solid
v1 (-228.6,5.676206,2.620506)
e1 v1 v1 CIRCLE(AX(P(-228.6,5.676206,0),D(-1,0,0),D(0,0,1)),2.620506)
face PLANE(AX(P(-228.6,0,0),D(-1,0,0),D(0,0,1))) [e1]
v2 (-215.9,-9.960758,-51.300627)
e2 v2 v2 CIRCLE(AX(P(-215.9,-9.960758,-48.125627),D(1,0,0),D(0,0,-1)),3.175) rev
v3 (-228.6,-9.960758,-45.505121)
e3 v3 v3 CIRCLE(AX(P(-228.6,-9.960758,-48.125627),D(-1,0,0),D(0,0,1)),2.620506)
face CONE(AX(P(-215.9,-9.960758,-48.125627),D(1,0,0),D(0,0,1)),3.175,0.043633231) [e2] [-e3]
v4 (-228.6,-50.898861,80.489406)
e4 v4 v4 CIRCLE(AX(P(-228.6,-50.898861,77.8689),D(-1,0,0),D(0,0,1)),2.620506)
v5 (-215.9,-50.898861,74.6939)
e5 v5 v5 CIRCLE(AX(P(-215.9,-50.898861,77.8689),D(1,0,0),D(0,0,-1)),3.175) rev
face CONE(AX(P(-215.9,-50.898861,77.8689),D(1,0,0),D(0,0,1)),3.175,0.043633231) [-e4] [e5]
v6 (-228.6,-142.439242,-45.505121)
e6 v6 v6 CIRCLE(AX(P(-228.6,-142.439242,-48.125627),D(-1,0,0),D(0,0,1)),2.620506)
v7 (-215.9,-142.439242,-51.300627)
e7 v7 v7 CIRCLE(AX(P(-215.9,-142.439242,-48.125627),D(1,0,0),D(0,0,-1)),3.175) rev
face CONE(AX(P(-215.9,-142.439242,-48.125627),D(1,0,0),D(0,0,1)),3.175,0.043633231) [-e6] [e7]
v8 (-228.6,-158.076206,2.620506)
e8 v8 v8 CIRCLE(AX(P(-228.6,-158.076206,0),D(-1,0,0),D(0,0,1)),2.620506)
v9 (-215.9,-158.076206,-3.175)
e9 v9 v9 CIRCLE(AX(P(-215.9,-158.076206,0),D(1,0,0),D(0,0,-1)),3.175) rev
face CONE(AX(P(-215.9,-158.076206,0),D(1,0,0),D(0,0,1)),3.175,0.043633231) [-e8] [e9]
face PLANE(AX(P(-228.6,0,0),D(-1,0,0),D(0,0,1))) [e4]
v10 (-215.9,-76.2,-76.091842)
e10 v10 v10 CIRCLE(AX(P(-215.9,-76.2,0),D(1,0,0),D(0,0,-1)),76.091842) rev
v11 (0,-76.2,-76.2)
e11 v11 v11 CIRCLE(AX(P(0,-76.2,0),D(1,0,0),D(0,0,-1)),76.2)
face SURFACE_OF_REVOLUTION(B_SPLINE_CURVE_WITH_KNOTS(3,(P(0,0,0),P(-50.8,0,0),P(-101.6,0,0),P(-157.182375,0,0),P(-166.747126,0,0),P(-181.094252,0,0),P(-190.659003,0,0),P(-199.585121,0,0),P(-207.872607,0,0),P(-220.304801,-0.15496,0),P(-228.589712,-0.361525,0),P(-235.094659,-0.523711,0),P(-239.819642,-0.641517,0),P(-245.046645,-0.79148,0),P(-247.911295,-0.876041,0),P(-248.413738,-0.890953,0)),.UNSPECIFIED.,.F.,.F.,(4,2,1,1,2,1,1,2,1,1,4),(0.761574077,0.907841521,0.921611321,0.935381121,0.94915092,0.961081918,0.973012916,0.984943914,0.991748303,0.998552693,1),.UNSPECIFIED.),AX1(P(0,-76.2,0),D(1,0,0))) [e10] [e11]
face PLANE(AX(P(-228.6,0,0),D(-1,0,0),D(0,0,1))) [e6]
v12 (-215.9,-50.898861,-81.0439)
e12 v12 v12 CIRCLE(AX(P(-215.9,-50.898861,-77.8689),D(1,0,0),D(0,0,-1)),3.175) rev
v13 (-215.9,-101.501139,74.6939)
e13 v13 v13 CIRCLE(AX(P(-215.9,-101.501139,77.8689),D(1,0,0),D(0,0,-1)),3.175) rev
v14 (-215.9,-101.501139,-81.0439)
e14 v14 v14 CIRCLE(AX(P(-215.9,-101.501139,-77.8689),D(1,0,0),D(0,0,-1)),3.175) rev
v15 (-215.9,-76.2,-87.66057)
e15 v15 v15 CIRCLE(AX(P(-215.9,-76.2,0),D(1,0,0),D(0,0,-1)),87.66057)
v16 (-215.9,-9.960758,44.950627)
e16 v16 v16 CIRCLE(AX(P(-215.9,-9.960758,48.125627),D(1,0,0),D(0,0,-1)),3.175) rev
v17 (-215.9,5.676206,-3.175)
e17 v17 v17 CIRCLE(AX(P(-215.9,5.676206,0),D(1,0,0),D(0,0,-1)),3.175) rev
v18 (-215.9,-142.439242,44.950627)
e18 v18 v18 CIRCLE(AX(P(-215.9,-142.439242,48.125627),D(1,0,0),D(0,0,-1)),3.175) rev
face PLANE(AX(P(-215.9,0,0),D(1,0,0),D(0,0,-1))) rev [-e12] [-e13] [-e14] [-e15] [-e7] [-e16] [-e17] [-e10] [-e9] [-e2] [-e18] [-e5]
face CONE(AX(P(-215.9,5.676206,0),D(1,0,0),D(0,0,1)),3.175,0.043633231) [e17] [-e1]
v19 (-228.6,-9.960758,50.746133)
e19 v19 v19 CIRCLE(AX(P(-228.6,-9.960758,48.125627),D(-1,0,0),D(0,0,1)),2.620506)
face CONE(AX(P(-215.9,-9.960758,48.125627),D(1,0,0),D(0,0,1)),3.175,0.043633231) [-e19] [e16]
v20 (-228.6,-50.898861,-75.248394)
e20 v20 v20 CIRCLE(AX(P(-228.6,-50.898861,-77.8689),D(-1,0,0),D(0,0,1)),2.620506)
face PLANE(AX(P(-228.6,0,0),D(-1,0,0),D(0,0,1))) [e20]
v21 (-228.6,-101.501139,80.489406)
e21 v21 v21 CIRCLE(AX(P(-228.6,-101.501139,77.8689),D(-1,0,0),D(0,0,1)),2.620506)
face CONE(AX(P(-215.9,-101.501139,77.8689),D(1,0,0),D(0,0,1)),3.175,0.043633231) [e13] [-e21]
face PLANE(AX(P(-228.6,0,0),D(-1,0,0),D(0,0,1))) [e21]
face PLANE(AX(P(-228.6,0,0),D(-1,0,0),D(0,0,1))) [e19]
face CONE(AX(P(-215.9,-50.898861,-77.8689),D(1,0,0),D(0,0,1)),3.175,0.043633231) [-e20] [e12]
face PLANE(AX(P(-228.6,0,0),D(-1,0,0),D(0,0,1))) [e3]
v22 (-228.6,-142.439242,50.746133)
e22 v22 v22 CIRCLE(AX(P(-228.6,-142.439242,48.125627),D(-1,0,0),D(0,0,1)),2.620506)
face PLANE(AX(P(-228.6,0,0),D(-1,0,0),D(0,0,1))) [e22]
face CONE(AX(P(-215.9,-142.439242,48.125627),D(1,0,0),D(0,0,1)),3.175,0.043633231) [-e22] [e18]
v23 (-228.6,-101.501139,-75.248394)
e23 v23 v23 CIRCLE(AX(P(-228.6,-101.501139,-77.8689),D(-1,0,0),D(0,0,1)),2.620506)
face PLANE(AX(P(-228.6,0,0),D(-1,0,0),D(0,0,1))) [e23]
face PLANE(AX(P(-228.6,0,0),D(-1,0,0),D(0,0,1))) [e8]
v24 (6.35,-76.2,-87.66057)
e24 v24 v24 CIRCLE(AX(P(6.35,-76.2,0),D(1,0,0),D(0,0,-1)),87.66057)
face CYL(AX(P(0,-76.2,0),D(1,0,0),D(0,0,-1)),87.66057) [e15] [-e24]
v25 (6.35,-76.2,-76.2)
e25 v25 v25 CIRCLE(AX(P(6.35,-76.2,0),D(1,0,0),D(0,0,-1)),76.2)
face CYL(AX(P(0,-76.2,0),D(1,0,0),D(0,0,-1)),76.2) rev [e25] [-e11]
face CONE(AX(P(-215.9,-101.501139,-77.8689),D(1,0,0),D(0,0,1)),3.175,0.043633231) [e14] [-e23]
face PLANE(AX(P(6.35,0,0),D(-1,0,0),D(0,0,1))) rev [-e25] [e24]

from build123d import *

# Parameters (mm, degrees)
SKETCH2_R                      = 110.114743718
CUT_EXTRUDE1_DEPTH             = 737.012183471
SKETCH3_R                      = 3.175
BOSS_EXTRUDE1_DEPTH            = 12.7
BOSS_EXTRUDE1_DRAFT            = 2.5
BOSS_EXTRUDE1_PROFILE_2_DEPTH  = 12.7
BOSS_EXTRUDE1_PROFILE_2_DRAFT  = 2.5
BOSS_EXTRUDE1_PROFILE_3_DEPTH  = 12.7
BOSS_EXTRUDE1_PROFILE_3_DRAFT  = 2.5
BOSS_EXTRUDE1_PROFILE_4_DEPTH  = 12.7
BOSS_EXTRUDE1_PROFILE_4_DRAFT  = 2.5
BOSS_EXTRUDE1_PROFILE_5_DEPTH  = 12.7
BOSS_EXTRUDE1_PROFILE_5_DRAFT  = 2.5
BOSS_EXTRUDE1_PROFILE_6_DEPTH  = 12.7
BOSS_EXTRUDE1_PROFILE_6_DRAFT  = 2.5
BOSS_EXTRUDE1_PROFILE_7_DEPTH  = 12.7
BOSS_EXTRUDE1_PROFILE_7_DRAFT  = 2.5
BOSS_EXTRUDE1_PROFILE_8_DEPTH  = 12.7
BOSS_EXTRUDE1_PROFILE_8_DRAFT  = 2.5
BOSS_EXTRUDE1_PROFILE_9_DEPTH  = 12.7
BOSS_EXTRUDE1_PROFILE_9_DRAFT  = 2.5
BOSS_EXTRUDE1_PROFILE_10_DEPTH = 12.7
BOSS_EXTRUDE1_PROFILE_10_DRAFT = 2.5


with BuildPart() as part:
    # Sketch1 → Revolve1 (revolve)
    with BuildSketch(Plane.XY):
        with BuildLine():
            Line((6.35, 11.460570284), (-259.812483715, 11.460570284))
            add(Edge.make_bspline(
                [(-259.812483715, 11.460570284), (-287.31210638, 10.562340852), (-342.298022137, 8.171569009), (-452.140135716, 1.833524736), (-589.280273052, -8.512118808), (-726.176632388, -21.770900754), (-835.465785428, -34.58872614), (-890.027026607, -41.965202762), (-917.245364413, -46.039623622)],
                knots=[0.121539178, 0.121539178, 0.121539178, 0.121539178, 0.200323508, 0.279107838, 0.436676499, 0.594245159, 0.67302949, 0.75181382, 0.75181382, 0.75181382, 0.75181382], degree=3))
            ThreePointArc((-917.245364413, -46.039623622), (-924.987260279, -50.310773033), (-928.0652, -58.599678629))
            Line((-928.0652, -58.599678629), (-921.7152, -58.599678629))
            ThreePointArc((-921.7152, -58.599678629), (-920.17623014, -54.455225831), (-916.305282206, -52.319651125))
            add(Edge.make_bspline(
                [(-259.605182082, 5.113954963), (-267.127682546, 4.868244998), (-283.42603151, 4.285669281), (-317.270262329, 2.880505646), (-361.130016616, 0.711244662), (-431.275457269, -3.371956494), (-501.372917975, -8.266876273), (-571.414486843, -13.891682648), (-623.914744737, -18.477698889), (-676.380314027, -23.439349795), (-728.80566324, -28.799062072), (-772.453634614, -33.627485173), (-807.34181653, -37.739154543), (-833.490683911, -40.958900147), (-859.619375692, -44.328941115), (-885.723877265, -47.869335132), (-904.612492975, -50.577906922), (-914.800968172, -52.094464395), (-916.305282206, -52.319651125)],
                knots=[0.121539178, 0.121539178, 0.121539178, 0.121539178, 0.143122913, 0.168303261, 0.218663957, 0.269024652, 0.369746043, 0.420106738, 0.470467434, 0.520828129, 0.571188825, 0.62154952, 0.646729868, 0.671910216, 0.697090564, 0.722270911, 0.747451259, 0.75181382, 0.75181382, 0.75181382, 0.75181382], degree=3))
            ThreePointArc((-259.605182082, 5.113954963), (-256.399753184, 4.364993874), (-254, 2.11179575))
            ThreePointArc((-254, 2.11179575), (-251.60858665, -0.136927523), (-248.413737762, -0.890953221))
            add(Edge.make_bspline(
                [(0, 0), (-50.8, 0), (-101.6, 0), (-157.182375328, 0), (-166.747125983, 0), (-181.094251966, 0), (-190.659002621, 0), (-199.585120865, 0), (-207.872606698, 0), (-220.304800851, -0.154959839), (-228.589711976, -0.361524821), (-235.094659099, -0.523710542), (-239.819642219, -0.641517002), (-245.046645359, -0.791480258), (-247.911294959, -0.876040976), (-248.413737762, -0.890953221)],
                knots=[0.761574077, 0.761574077, 0.761574077, 0.761574077, 0.907841521, 0.907841521, 0.921611321, 0.935381121, 0.94915092, 0.94915092, 0.961081918, 0.973012916, 0.984943914, 0.984943914, 0.991748303, 0.998552693, 1, 1, 1, 1], degree=3))
            Line((0, 0), (6.35, 0))
            Line((6.35, 0), (6.35, 11.460570284))
        make_face()
    revolve(axis=Axis((0, -76.2, 0), (-1, 0, 0)))

    # Sketch2 → Cut-Extrude1 (cut, through all)
    with BuildSketch(Plane(origin=(-215.9, 0, 0), x_dir=(0, 0, -1), z_dir=(1, 0, 0))):
        with Locations((0, -76.2)):
            Circle(SKETCH2_R)
    extrude(amount=-CUT_EXTRUDE1_DEPTH, mode=Mode.SUBTRACT)


with BuildPart() as boss_extrude1_tool:
    # Sketch3 → Boss-Extrude1 (with draft: the straight prism first)
    with BuildSketch(Plane.ZY.offset(215.9)):
        with Locations((0, 5.676206313)):
            Circle(SKETCH3_R)
    extrude(amount=BOSS_EXTRUDE1_DEPTH)
    # Boss-Extrude1: the draft: its side faces are tilted about the plane it starts from
    boss_extrude1_sides = [boss_extrude1_tool.faces().sort_by_distance(p)[0] for p in [
        (-222.25, 5.676206313, -3.175),
    ]]
    draft(boss_extrude1_sides, Plane.ZY.offset(215.9), BOSS_EXTRUDE1_DRAFT)


with BuildPart() as part_1:
    add(part.part)

    # Boss-Extrude1: add boss_extrude1_tool
    add(boss_extrude1_tool.part)


with BuildPart() as boss_extrude1_profile_2_tool:
    # Sketch3 → Boss-Extrude1 profile 2 (with draft: the straight prism first)
    with BuildSketch(Plane.ZY.offset(215.9)):
        with Locations((48.125626585, -9.960757658)):
            Circle(SKETCH3_R)
    extrude(amount=BOSS_EXTRUDE1_PROFILE_2_DEPTH)
    # Boss-Extrude1 profile 2: the draft: its side faces are tilted about the plane it starts from
    boss_extrude1_profile_2_sides = [boss_extrude1_profile_2_tool.faces().sort_by_distance(p)[0] for p in [
        (-222.25, -9.960757658, 44.950626585),
    ]]
    draft(boss_extrude1_profile_2_sides, Plane.ZY.offset(215.9), BOSS_EXTRUDE1_PROFILE_2_DRAFT)


with BuildPart() as part_2:
    add(part_1.part)

    # Boss-Extrude1 profile 2: add boss_extrude1_profile_2_tool
    add(boss_extrude1_profile_2_tool.part)


with BuildPart() as boss_extrude1_profile_3_tool:
    # Sketch3 → Boss-Extrude1 profile 3 (with draft: the straight prism first)
    with BuildSketch(Plane.ZY.offset(215.9)):
        with Locations((77.868899544, -50.898860814)):
            Circle(SKETCH3_R)
    extrude(amount=BOSS_EXTRUDE1_PROFILE_3_DEPTH)
    # Boss-Extrude1 profile 3: the draft: its side faces are tilted about the plane it starts from
    boss_extrude1_profile_3_sides = [boss_extrude1_profile_3_tool.faces().sort_by_distance(p)[0] for p in [
        (-222.25, -50.898860814, 74.693899544),
    ]]
    draft(boss_extrude1_profile_3_sides, Plane.ZY.offset(215.9), BOSS_EXTRUDE1_PROFILE_3_DRAFT)


with BuildPart() as part_3:
    add(part_2.part)

    # Boss-Extrude1 profile 3: add boss_extrude1_profile_3_tool
    add(boss_extrude1_profile_3_tool.part)


with BuildPart() as boss_extrude1_profile_4_tool:
    # Sketch3 → Boss-Extrude1 profile 4 (with draft: the straight prism first)
    with BuildSketch(Plane.ZY.offset(215.9)):
        with Locations((77.868899544, -101.501139186)):
            Circle(SKETCH3_R)
    extrude(amount=BOSS_EXTRUDE1_PROFILE_4_DEPTH)
    # Boss-Extrude1 profile 4: the draft: its side faces are tilted about the plane it starts from
    boss_extrude1_profile_4_sides = [boss_extrude1_profile_4_tool.faces().sort_by_distance(p)[0] for p in [
        (-222.25, -101.501139186, 74.693899544),
    ]]
    draft(boss_extrude1_profile_4_sides, Plane.ZY.offset(215.9), BOSS_EXTRUDE1_PROFILE_4_DRAFT)


with BuildPart() as part_4:
    add(part_3.part)

    # Boss-Extrude1 profile 4: add boss_extrude1_profile_4_tool
    add(boss_extrude1_profile_4_tool.part)


with BuildPart() as boss_extrude1_profile_5_tool:
    # Sketch3 → Boss-Extrude1 profile 5 (with draft: the straight prism first)
    with BuildSketch(Plane.ZY.offset(215.9)):
        with Locations((48.125626585, -142.439242342)):
            Circle(SKETCH3_R)
    extrude(amount=BOSS_EXTRUDE1_PROFILE_5_DEPTH)
    # Boss-Extrude1 profile 5: the draft: its side faces are tilted about the plane it starts from
    boss_extrude1_profile_5_sides = [boss_extrude1_profile_5_tool.faces().sort_by_distance(p)[0] for p in [
        (-222.25, -142.439242342, 44.950626585),
    ]]
    draft(boss_extrude1_profile_5_sides, Plane.ZY.offset(215.9), BOSS_EXTRUDE1_PROFILE_5_DRAFT)


with BuildPart() as part_5:
    add(part_4.part)

    # Boss-Extrude1 profile 5: add boss_extrude1_profile_5_tool
    add(boss_extrude1_profile_5_tool.part)


with BuildPart() as boss_extrude1_profile_6_tool:
    # Sketch3 → Boss-Extrude1 profile 6 (with draft: the straight prism first)
    with BuildSketch(Plane.ZY.offset(215.9)):
        with Locations((0, -158.076206313)):
            Circle(SKETCH3_R)
    extrude(amount=BOSS_EXTRUDE1_PROFILE_6_DEPTH)
    # Boss-Extrude1 profile 6: the draft: its side faces are tilted about the plane it starts from
    boss_extrude1_profile_6_sides = [boss_extrude1_profile_6_tool.faces().sort_by_distance(p)[0] for p in [
        (-222.25, -158.076206313, -3.175),
    ]]
    draft(boss_extrude1_profile_6_sides, Plane.ZY.offset(215.9), BOSS_EXTRUDE1_PROFILE_6_DRAFT)


with BuildPart() as part_6:
    add(part_5.part)

    # Boss-Extrude1 profile 6: add boss_extrude1_profile_6_tool
    add(boss_extrude1_profile_6_tool.part)


with BuildPart() as boss_extrude1_profile_7_tool:
    # Sketch3 → Boss-Extrude1 profile 7 (with draft: the straight prism first)
    with BuildSketch(Plane.ZY.offset(215.9)):
        with Locations((-48.125626585, -142.439242342)):
            Circle(SKETCH3_R)
    extrude(amount=BOSS_EXTRUDE1_PROFILE_7_DEPTH)
    # Boss-Extrude1 profile 7: the draft: its side faces are tilted about the plane it starts from
    boss_extrude1_profile_7_sides = [boss_extrude1_profile_7_tool.faces().sort_by_distance(p)[0] for p in [
        (-222.25, -142.439242342, -51.300626585),
    ]]
    draft(boss_extrude1_profile_7_sides, Plane.ZY.offset(215.9), BOSS_EXTRUDE1_PROFILE_7_DRAFT)


with BuildPart() as part_7:
    add(part_6.part)

    # Boss-Extrude1 profile 7: add boss_extrude1_profile_7_tool
    add(boss_extrude1_profile_7_tool.part)


with BuildPart() as boss_extrude1_profile_8_tool:
    # Sketch3 → Boss-Extrude1 profile 8 (with draft: the straight prism first)
    with BuildSketch(Plane.ZY.offset(215.9)):
        with Locations((-77.868899544, -101.501139186)):
            Circle(SKETCH3_R)
    extrude(amount=BOSS_EXTRUDE1_PROFILE_8_DEPTH)
    # Boss-Extrude1 profile 8: the draft: its side faces are tilted about the plane it starts from
    boss_extrude1_profile_8_sides = [boss_extrude1_profile_8_tool.faces().sort_by_distance(p)[0] for p in [
        (-222.25, -101.501139186, -81.043899544),
    ]]
    draft(boss_extrude1_profile_8_sides, Plane.ZY.offset(215.9), BOSS_EXTRUDE1_PROFILE_8_DRAFT)


with BuildPart() as part_8:
    add(part_7.part)

    # Boss-Extrude1 profile 8: add boss_extrude1_profile_8_tool
    add(boss_extrude1_profile_8_tool.part)


with BuildPart() as boss_extrude1_profile_9_tool:
    # Sketch3 → Boss-Extrude1 profile 9 (with draft: the straight prism first)
    with BuildSketch(Plane.ZY.offset(215.9)):
        with Locations((-77.868899544, -50.898860814)):
            Circle(SKETCH3_R)
    extrude(amount=BOSS_EXTRUDE1_PROFILE_9_DEPTH)
    # Boss-Extrude1 profile 9: the draft: its side faces are tilted about the plane it starts from
    boss_extrude1_profile_9_sides = [boss_extrude1_profile_9_tool.faces().sort_by_distance(p)[0] for p in [
        (-222.25, -50.898860814, -81.043899544),
    ]]
    draft(boss_extrude1_profile_9_sides, Plane.ZY.offset(215.9), BOSS_EXTRUDE1_PROFILE_9_DRAFT)


with BuildPart() as part_9:
    add(part_8.part)

    # Boss-Extrude1 profile 9: add boss_extrude1_profile_9_tool
    add(boss_extrude1_profile_9_tool.part)


with BuildPart() as boss_extrude1_profile_10_tool:
    # Sketch3 → Boss-Extrude1 profile 10 (with draft: the straight prism first)
    with BuildSketch(Plane.ZY.offset(215.9)):
        with Locations((-48.125626585, -9.960757658)):
            Circle(SKETCH3_R)
    extrude(amount=BOSS_EXTRUDE1_PROFILE_10_DEPTH)
    # Boss-Extrude1 profile 10: the draft: its side faces are tilted about the plane it starts from
    boss_extrude1_profile_10_sides = [boss_extrude1_profile_10_tool.faces().sort_by_distance(p)[0] for p in [
        (-222.25, -9.960757658, -51.300626585),
    ]]
    draft(boss_extrude1_profile_10_sides, Plane.ZY.offset(215.9), BOSS_EXTRUDE1_PROFILE_10_DRAFT)


with BuildPart() as part_10:
    add(part_9.part)

    # Boss-Extrude1 profile 10: add boss_extrude1_profile_10_tool
    add(boss_extrude1_profile_10_tool.part)


solid = part_10.part
